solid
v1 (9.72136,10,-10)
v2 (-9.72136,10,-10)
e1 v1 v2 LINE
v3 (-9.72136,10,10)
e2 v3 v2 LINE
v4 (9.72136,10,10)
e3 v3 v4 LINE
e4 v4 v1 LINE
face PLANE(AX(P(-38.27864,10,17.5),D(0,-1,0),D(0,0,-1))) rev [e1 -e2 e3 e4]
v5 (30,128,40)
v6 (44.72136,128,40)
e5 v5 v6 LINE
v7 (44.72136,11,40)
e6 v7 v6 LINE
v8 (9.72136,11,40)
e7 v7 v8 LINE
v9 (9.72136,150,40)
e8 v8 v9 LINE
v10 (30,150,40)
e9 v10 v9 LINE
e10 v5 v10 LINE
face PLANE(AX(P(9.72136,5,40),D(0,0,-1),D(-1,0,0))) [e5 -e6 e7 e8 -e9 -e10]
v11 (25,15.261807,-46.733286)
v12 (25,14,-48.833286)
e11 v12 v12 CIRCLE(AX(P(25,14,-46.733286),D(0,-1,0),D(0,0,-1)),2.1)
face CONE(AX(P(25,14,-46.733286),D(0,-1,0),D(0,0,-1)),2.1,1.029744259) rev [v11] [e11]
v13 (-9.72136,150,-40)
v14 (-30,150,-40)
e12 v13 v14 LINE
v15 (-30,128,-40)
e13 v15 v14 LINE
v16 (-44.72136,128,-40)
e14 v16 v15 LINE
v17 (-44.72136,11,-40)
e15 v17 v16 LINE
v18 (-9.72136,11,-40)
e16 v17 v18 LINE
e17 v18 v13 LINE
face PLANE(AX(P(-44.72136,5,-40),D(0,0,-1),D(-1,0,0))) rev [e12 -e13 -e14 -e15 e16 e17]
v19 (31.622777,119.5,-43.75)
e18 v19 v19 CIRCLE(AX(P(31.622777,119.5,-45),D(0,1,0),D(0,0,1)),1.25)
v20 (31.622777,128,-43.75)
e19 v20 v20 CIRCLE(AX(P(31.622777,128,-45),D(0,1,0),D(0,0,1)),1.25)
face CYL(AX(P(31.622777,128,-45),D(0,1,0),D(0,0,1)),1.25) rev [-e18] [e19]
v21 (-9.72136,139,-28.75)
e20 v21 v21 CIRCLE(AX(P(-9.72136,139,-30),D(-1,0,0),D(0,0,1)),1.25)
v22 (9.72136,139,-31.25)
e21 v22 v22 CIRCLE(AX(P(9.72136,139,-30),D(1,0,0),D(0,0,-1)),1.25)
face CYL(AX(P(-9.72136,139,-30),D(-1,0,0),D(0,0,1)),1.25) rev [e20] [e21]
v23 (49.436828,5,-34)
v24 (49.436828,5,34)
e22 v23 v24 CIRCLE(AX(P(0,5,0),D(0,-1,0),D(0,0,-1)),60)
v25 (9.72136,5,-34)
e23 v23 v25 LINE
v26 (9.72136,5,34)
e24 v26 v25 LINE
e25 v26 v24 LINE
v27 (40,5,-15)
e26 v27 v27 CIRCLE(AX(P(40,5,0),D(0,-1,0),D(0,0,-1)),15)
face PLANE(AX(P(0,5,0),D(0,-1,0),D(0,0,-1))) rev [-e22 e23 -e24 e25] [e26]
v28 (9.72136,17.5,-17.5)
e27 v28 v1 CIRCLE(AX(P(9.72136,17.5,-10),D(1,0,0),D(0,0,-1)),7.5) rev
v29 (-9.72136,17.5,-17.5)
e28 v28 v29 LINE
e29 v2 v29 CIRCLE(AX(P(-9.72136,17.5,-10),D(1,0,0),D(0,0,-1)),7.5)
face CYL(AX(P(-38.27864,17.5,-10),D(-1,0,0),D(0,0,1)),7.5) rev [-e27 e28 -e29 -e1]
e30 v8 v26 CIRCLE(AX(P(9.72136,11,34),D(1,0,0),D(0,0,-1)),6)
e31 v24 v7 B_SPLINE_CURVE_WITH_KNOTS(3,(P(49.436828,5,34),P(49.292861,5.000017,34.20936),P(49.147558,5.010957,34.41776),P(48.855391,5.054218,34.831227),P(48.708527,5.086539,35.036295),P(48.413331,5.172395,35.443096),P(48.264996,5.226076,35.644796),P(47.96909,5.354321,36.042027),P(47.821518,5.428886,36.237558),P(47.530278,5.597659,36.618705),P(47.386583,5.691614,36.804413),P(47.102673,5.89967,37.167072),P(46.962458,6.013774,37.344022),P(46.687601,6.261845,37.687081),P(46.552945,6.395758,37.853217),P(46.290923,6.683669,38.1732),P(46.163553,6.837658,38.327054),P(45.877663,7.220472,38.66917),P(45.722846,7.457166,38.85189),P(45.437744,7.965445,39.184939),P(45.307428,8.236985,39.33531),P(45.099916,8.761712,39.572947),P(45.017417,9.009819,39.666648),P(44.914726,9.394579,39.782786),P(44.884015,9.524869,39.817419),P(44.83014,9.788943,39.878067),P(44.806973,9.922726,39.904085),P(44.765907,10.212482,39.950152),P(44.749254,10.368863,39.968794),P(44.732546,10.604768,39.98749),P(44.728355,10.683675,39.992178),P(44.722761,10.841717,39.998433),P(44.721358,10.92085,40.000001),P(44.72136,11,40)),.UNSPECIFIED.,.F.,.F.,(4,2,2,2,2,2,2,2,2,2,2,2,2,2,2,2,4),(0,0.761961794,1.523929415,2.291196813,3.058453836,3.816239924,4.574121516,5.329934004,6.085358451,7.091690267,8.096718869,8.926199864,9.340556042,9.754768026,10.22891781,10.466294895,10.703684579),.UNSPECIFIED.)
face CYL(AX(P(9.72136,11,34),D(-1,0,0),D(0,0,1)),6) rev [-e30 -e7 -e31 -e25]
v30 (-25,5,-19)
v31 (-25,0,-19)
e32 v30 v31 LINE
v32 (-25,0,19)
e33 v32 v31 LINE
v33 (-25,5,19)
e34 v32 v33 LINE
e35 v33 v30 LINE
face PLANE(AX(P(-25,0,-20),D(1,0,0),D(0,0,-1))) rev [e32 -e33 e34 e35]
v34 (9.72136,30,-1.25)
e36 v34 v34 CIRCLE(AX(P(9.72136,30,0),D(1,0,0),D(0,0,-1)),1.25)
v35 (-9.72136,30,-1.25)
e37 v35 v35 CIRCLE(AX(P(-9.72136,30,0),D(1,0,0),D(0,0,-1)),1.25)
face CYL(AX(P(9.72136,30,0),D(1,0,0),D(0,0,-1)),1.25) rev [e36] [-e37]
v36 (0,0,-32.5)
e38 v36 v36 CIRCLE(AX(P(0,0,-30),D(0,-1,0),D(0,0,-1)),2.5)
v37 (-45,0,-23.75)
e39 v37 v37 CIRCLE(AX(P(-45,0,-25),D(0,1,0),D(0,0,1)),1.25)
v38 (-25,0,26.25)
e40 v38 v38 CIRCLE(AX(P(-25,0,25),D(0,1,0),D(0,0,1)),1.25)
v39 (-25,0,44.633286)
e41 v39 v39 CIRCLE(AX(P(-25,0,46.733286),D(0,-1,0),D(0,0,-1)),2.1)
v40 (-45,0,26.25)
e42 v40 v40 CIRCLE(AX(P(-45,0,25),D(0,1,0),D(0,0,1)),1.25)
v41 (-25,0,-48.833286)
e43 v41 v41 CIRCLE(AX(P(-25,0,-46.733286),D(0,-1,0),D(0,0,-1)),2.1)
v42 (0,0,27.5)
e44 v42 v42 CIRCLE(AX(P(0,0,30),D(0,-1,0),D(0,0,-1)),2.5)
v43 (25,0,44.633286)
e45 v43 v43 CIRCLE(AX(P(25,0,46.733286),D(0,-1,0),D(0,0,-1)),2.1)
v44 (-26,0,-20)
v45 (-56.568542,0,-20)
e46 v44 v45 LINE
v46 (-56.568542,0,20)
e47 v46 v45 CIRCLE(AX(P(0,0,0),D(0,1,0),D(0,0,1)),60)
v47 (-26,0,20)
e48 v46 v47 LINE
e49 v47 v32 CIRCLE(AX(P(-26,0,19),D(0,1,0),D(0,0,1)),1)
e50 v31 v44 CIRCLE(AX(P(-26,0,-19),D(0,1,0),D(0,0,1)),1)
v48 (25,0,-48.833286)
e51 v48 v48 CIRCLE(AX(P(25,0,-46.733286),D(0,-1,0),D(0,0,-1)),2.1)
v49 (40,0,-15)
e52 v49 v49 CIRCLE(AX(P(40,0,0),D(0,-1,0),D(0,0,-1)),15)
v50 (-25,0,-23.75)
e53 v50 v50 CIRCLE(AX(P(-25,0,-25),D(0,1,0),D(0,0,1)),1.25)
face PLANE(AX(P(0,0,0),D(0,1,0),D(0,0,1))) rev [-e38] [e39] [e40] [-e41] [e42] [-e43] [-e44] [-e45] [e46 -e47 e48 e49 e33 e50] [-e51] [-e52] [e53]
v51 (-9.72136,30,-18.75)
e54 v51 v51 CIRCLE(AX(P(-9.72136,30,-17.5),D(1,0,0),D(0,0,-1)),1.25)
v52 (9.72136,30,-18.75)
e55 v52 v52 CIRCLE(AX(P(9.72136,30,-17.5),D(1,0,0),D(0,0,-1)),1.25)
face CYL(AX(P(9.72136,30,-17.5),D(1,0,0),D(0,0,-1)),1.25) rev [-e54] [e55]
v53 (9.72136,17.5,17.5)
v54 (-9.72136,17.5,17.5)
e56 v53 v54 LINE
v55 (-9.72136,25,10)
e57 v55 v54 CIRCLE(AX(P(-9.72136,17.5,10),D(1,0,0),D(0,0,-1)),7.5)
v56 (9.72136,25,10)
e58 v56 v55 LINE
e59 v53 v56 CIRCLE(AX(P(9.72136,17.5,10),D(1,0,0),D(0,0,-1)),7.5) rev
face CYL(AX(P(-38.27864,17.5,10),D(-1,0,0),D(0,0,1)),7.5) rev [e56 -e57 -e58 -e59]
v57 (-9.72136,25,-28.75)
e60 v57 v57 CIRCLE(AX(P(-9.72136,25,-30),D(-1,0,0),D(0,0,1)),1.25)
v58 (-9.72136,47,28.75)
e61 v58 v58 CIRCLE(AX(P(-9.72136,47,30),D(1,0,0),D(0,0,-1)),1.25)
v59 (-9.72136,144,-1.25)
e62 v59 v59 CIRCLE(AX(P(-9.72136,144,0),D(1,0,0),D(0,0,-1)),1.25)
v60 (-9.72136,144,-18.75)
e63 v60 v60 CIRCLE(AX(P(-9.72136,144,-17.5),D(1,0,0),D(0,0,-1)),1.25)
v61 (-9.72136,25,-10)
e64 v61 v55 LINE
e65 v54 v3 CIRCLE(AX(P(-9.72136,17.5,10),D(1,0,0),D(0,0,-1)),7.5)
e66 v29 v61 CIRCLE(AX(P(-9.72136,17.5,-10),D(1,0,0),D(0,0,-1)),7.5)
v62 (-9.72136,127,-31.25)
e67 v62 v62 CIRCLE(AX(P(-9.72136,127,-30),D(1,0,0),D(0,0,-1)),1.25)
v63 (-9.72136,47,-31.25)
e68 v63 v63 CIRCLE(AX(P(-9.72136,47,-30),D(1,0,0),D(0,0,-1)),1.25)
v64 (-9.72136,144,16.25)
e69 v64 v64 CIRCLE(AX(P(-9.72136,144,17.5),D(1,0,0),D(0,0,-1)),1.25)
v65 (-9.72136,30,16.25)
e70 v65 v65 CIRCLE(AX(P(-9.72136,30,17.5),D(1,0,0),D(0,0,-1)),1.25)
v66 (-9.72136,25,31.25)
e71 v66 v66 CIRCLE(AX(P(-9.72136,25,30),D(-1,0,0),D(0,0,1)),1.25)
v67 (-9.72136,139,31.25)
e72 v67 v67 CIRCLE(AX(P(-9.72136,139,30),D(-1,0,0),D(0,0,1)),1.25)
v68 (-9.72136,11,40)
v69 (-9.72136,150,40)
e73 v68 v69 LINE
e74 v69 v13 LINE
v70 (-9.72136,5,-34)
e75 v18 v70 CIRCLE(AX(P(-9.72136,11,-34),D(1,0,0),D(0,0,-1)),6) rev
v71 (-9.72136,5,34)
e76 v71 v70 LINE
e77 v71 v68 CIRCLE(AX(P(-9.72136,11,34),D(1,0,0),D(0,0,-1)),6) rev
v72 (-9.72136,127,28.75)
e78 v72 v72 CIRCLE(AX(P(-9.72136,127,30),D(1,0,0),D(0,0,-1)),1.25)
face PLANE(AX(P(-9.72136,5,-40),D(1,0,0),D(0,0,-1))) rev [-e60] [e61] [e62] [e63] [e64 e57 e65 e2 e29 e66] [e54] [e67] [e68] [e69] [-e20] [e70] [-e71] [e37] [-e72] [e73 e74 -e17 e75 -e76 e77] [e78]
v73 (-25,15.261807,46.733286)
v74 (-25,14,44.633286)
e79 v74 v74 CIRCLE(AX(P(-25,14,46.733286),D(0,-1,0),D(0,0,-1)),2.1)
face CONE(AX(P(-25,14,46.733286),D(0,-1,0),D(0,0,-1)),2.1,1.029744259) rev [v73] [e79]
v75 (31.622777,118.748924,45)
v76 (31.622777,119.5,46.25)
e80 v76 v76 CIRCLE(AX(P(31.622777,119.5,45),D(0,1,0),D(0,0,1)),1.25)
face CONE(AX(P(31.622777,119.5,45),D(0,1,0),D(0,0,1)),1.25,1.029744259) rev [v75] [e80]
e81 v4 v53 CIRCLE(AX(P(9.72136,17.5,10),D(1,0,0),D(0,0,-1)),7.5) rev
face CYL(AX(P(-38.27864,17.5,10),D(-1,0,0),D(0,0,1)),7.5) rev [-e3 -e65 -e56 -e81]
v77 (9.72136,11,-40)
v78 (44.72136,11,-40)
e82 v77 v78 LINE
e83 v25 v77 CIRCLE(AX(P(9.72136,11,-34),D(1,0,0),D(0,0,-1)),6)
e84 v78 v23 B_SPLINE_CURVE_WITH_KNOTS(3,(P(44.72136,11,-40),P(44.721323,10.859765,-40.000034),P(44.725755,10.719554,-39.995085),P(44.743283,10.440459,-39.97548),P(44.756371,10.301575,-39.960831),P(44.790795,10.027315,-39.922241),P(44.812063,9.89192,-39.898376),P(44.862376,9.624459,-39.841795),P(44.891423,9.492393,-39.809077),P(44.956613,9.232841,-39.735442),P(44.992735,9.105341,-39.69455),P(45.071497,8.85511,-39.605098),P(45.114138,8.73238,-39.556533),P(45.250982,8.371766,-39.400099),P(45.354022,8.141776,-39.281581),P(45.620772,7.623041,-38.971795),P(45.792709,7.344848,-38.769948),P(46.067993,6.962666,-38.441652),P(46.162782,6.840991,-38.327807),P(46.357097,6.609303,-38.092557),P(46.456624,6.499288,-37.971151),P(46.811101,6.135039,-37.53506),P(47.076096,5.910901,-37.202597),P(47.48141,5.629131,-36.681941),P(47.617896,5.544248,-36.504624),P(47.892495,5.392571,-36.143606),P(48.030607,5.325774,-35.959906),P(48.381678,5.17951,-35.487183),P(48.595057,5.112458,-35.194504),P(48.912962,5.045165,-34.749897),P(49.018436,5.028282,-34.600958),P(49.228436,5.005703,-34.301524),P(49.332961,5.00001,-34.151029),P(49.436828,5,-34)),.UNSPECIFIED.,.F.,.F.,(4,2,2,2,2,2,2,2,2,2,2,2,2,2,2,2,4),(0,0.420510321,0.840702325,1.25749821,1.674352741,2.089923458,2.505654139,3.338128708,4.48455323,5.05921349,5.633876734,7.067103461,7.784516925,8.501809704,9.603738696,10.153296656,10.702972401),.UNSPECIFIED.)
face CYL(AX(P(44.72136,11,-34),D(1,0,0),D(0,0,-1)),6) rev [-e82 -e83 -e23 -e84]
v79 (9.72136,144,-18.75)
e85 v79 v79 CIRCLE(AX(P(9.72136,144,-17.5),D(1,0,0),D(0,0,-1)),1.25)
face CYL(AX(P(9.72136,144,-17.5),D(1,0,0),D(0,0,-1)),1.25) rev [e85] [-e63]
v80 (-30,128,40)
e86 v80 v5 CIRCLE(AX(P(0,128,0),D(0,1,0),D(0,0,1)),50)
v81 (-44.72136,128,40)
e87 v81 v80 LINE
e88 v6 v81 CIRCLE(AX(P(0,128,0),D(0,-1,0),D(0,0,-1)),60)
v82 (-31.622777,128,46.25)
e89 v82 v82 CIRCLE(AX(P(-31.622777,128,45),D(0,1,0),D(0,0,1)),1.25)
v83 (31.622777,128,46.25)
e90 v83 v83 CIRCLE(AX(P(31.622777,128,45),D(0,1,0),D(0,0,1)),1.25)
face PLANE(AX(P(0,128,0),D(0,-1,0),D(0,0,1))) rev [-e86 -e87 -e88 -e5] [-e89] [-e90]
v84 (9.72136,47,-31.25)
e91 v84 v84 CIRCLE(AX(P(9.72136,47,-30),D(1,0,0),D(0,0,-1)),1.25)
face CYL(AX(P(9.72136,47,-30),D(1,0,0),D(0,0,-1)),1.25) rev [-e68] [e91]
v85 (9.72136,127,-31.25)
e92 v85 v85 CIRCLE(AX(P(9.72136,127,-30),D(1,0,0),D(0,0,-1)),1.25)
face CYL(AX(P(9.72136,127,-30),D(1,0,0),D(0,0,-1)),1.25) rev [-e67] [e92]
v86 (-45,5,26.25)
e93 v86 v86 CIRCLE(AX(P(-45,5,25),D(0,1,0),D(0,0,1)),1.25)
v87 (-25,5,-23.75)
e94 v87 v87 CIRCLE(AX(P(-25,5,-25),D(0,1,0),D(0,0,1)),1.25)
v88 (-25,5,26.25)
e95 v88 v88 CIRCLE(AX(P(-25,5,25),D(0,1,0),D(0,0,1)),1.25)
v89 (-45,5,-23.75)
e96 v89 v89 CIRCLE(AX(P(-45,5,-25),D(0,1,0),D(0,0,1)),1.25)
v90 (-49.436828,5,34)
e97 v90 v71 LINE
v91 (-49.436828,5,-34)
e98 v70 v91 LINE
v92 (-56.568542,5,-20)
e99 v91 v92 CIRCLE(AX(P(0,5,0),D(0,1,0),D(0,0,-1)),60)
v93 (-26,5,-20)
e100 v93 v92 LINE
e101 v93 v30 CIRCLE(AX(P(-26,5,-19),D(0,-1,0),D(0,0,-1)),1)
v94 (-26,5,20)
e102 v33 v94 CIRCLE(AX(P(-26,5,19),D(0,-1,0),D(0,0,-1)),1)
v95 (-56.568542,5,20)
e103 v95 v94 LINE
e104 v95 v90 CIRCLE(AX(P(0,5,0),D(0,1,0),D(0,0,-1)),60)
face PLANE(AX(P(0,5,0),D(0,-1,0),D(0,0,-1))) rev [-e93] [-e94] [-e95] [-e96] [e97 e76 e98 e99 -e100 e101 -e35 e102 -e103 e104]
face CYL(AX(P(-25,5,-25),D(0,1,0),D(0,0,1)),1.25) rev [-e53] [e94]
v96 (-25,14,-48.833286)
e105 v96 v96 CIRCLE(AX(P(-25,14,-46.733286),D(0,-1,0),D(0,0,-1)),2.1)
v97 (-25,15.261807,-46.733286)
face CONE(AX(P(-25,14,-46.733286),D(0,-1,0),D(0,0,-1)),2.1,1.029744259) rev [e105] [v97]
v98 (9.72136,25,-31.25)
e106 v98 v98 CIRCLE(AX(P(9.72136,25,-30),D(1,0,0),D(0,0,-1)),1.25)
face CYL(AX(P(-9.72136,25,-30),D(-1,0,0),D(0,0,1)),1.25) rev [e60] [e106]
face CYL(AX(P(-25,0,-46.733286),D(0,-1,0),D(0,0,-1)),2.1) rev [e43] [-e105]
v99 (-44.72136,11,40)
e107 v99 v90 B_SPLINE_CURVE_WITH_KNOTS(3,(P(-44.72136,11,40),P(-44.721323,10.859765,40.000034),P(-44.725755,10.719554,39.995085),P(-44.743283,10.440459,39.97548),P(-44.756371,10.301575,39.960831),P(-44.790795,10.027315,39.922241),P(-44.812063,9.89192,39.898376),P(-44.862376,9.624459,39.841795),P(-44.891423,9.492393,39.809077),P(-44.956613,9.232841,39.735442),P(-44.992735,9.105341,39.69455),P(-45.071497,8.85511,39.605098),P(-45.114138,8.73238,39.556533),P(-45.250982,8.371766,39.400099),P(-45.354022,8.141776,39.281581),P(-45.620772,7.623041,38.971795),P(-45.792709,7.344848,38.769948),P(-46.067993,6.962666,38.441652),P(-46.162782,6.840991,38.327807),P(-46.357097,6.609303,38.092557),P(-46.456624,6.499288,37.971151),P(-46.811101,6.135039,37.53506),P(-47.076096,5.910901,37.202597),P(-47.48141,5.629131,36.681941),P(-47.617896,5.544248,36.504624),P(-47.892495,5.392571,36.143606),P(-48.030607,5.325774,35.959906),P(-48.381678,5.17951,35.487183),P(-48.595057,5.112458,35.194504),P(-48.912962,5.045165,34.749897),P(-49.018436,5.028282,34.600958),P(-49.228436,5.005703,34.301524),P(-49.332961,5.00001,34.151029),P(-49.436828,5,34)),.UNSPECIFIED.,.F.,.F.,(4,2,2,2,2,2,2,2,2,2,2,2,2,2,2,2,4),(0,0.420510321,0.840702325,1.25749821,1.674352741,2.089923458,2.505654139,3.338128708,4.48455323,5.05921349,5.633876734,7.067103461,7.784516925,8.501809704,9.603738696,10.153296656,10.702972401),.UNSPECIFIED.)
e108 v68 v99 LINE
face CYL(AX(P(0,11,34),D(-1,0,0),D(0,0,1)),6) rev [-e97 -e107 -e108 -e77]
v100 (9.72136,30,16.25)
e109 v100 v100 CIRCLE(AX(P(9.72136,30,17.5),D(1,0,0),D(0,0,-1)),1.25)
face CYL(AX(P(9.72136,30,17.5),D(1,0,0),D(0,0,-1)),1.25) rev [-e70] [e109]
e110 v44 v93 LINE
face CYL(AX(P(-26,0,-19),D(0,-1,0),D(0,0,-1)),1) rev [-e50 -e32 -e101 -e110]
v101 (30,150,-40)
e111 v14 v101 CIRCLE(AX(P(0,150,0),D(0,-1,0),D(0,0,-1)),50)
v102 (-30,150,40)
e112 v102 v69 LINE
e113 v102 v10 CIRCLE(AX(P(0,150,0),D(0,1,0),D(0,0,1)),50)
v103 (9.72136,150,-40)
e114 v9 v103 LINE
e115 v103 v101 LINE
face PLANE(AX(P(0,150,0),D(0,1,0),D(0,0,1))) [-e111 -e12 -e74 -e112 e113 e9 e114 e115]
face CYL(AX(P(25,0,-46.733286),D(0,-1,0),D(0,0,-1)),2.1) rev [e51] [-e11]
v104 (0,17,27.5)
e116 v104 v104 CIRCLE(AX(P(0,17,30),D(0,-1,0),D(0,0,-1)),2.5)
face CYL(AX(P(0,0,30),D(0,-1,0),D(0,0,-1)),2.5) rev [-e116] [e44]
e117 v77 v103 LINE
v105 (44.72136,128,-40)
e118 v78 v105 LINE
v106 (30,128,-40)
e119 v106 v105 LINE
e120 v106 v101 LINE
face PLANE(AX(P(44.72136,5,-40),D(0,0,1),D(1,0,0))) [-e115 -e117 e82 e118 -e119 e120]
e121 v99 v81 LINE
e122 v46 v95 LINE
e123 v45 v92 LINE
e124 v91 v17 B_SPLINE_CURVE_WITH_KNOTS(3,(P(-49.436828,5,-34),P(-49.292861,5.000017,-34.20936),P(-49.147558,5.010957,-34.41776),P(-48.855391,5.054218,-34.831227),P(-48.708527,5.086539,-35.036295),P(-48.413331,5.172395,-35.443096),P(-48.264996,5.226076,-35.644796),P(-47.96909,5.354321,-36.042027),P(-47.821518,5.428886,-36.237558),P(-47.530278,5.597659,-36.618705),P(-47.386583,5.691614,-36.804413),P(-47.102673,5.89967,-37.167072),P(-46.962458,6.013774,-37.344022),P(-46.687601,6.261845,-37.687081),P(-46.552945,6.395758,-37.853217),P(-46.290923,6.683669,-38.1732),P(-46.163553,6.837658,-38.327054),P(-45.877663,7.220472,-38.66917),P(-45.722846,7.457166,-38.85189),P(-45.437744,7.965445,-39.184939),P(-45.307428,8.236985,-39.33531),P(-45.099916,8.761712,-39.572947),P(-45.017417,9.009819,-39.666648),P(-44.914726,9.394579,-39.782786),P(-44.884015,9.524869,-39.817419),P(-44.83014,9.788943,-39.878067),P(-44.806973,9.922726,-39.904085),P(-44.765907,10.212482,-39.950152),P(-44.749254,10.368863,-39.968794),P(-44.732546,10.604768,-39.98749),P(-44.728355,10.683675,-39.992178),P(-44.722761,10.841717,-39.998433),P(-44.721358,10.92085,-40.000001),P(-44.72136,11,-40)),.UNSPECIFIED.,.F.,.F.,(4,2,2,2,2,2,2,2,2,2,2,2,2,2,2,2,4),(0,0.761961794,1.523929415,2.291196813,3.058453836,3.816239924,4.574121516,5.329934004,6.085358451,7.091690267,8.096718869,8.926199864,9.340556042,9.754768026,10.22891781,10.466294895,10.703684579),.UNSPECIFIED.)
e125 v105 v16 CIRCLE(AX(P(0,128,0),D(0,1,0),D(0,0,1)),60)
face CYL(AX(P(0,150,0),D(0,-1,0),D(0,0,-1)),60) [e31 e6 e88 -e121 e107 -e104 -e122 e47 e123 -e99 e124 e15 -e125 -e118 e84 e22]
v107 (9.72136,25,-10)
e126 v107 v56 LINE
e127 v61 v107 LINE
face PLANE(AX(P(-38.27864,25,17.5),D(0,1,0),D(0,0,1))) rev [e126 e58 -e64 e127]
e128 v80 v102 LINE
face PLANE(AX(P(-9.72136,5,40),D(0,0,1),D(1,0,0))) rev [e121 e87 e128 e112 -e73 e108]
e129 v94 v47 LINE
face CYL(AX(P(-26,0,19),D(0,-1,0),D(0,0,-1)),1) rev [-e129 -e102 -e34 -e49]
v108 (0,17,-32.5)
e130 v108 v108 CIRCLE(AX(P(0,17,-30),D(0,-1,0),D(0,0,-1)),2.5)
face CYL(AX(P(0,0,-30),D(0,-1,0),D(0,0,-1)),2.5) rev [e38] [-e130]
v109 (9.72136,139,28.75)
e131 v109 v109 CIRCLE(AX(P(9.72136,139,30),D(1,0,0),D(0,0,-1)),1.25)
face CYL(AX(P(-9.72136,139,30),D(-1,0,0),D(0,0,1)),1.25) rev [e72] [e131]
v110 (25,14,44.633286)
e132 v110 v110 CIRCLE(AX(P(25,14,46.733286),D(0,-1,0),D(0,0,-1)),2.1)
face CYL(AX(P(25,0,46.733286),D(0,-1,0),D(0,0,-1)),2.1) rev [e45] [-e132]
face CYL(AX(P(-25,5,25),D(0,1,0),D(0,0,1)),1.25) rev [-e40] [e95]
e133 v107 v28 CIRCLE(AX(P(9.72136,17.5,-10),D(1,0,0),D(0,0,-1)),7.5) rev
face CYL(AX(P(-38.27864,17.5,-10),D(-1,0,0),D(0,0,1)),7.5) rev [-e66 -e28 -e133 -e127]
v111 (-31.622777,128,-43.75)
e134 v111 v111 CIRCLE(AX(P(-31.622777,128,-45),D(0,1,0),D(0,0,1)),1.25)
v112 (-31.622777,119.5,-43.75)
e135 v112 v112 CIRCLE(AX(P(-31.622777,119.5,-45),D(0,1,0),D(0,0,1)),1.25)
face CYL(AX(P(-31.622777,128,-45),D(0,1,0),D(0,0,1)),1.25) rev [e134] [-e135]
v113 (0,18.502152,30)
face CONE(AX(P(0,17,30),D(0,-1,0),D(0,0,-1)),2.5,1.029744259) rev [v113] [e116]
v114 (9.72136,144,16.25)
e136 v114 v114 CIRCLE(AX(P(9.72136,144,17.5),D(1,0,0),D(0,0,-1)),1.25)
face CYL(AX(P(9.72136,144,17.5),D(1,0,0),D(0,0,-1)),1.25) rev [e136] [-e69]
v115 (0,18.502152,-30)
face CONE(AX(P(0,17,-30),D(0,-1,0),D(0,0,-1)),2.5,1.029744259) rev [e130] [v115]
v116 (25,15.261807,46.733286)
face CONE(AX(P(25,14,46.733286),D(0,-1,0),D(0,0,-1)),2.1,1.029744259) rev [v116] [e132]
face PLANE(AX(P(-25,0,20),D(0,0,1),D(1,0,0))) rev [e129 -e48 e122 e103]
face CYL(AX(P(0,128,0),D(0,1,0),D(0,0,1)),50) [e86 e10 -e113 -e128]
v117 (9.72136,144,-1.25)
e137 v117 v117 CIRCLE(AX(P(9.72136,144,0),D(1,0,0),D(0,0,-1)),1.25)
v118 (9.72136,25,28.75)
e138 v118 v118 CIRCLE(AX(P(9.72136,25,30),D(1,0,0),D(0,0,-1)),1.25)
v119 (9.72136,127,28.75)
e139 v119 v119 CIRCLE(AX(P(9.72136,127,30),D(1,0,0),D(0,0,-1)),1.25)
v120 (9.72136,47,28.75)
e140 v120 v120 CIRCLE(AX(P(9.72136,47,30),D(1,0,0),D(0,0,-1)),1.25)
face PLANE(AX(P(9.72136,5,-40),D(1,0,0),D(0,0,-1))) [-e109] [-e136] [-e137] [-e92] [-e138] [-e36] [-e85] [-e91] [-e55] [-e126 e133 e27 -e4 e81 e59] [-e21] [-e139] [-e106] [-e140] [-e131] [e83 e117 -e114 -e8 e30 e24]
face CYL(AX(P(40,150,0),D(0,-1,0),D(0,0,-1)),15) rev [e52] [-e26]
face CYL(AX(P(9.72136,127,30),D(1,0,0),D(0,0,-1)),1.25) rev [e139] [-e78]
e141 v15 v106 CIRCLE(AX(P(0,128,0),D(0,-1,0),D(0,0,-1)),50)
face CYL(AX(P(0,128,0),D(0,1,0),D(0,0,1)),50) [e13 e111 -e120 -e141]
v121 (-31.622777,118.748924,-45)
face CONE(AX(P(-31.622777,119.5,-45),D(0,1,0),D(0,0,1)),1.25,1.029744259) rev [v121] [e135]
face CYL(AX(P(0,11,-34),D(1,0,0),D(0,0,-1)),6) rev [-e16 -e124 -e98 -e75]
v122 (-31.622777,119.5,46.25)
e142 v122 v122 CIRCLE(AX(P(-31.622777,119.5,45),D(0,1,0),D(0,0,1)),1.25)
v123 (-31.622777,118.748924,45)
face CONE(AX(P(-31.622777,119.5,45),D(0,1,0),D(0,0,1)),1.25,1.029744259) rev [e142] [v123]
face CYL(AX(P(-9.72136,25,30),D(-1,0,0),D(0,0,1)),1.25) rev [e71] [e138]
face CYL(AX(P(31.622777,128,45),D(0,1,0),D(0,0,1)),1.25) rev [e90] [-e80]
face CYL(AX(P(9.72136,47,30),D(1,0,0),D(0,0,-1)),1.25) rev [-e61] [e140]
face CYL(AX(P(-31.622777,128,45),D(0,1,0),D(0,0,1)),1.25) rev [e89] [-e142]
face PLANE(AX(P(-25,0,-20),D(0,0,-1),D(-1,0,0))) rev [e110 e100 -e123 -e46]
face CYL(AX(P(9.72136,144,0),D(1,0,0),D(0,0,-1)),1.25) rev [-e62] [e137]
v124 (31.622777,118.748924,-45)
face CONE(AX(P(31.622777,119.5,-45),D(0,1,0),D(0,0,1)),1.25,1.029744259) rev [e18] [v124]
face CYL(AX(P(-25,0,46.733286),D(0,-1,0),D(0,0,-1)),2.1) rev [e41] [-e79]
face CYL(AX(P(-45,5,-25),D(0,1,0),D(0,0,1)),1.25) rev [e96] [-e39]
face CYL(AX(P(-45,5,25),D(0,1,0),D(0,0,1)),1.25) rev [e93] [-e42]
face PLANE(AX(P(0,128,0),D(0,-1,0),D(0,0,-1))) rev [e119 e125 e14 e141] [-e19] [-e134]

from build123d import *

# Parameters (mm, degrees)
SKETCH_1_R                         = 60
EXTRUDE_1_DEPTH                    = 150
CUT_EXTRUDE_START                  = -145
CUT_EXTRUDE_1_DEPTH                = 145
M3X0_5_6MM_D                       = 2.5
CUT_EXTRUDE_START_2                = -22
CUT_EXTRUDE_2_DEPTH                = 22
M3X0_5_SPACER_HUB_BOARD_AT_2_COUNT = 2
M3X0_5_SPACER_HUB_BOARD_AT_2_PITCH = 63.245553203
CUT_EXTRUDE_5070_DEPTH             = 169.002976164
SKETCH_14_R                        = 15
CUT_EXTRUDE_5330_DEPTH             = 173.336879396
M3X0_5_6MM_OBC_D                   = 2.5
FILLET_1_R                         = 1
M5X0_8_20MM_BASW_PLATE_D           = 4.2
M5X0_8_20MM_BASW_PLATE_DEPTH       = 14
M5X0_8_20MM_BASW_PLATE_TIP         = 1.2618073
FILLET_2_R                         = 6
FILLET_3_R                         = 6
SKETCH_19_W                        = 35
SKETCH_19_H                        = 15
CUT_EXTRUDE_3_DEPTH                = 48
FILLET_4_R                         = 7.5
M3X0_5_2_D                         = 2.5
M3X0_5_3_D                         = 2.5


with BuildPart() as part:
    # ｽｹｯﾁ1 → ﾎﾞｽ - 押し出し1 (new body)
    with BuildSketch(Plane(origin=(0, 0, 0), x_dir=(1, 0, 0), z_dir=(0, 1, 0))):
        with Locations(Location((0, 0, 0), (0, 0, 270))):
            Circle(SKETCH_1_R)
    extrude(amount=EXTRUDE_1_DEPTH)

    # ｽｹｯﾁ2 → ｶｯﾄ - 押し出し1 (cut)
    with BuildSketch(Plane(origin=(0, 150, 0), x_dir=(1, 0, 0), z_dir=(0, 1, 0)).offset(CUT_EXTRUDE_START)):
        with BuildLine():
            Line((-44.72135955, 40), (-9.72135955, 40))
            Line((-9.72135955, 40), (-9.72135955, -40))
            Line((-9.72135955, -40), (-44.72135955, -40))
            ThreePointArc((-44.72135955, -40), (-60, 0), (-44.72135955, 40))
        make_face()
    cut_extrude_1 = extrude(amount=CUT_EXTRUDE_1_DEPTH, mode=Mode.SUBTRACT)

    # ﾐﾗｰ1: ｶｯﾄ - 押し出し1 across plane
    add(cut_extrude_1.mirror(Plane(origin=(0, 0, 0), x_dir=(0, 0, 1), z_dir=(1, 0, 0))), mode=Mode.SUBTRACT)

    # ｽｹｯﾁ4 → M6x1.0(20mm) Base_Plateへの固定用ねじ穴 (revolve, cut)
    with BuildSketch(Plane(origin=(0, 0, 30), x_dir=(0, 0, -1), z_dir=(1, 0, 0))):
        Polygon((0, 0), (0, 18.502151548), (2.5, 17), (2.5, 0), align=None)
    m6x1_0_20mm_base_plate = revolve(axis=Axis((0, -6.35, 30), (0, 1, 0)), mode=Mode.SUBTRACT)

    # ﾐﾗｰ2: M6x1.0(20mm) Base_Plateへの固定用ねじ穴 across plane
    add(m6x1_0_20mm_base_plate.mirror(Plane.XY), mode=Mode.SUBTRACT)

    # M3x0.5(6mm) 送信機固定用ねじ穴 (through all)
    with Locations(Plane(origin=(9.72135955, 144, 17.5), x_dir=(0, 0, 1), z_dir=(1, 0, 0))):
        with Locations((0, 0), (-17.5, 0), (-35, 0), (-17.5, 114), (0, 114), (-35, 114)):
            Hole(M3X0_5_6MM_D / 2)

    # ｽｹｯﾁ10 → ｶｯﾄ - 押し出し2 (cut)
    with BuildSketch(Plane(origin=(0, 150, 0), x_dir=(1, 0, 0), z_dir=(0, 1, 0)).offset(CUT_EXTRUDE_START_2)):
        with BuildLine():
            Line((-30, 40), (-44.72135955, 40))
            ThreePointArc((-44.72135955, 40), (0, 60), (44.72135955, 40))
            Line((44.72135955, 40), (30, 40))
            ThreePointArc((30, 40), (0, 50), (-30, 40))
        make_face()
    cut_extrude_2 = extrude(amount=CUT_EXTRUDE_2_DEPTH, mode=Mode.SUBTRACT)

    # ﾐﾗｰ3: ｶｯﾄ - 押し出し2 across plane
    add(cut_extrude_2.mirror(Plane.XY), mode=Mode.SUBTRACT)

    # ｽｹｯﾁ12 → M3x0.5(Spacer) Hub_Board固定用ねじ穴 (revolve, cut)
    with BuildSketch(Plane(origin=(-31.622776602, 128, -45), x_dir=(0, 0, 1), z_dir=(1, 0, 0))):
        Polygon((0, 0), (0, 9.251075774), (1.25, 8.5), (1.25, 0), align=None)
    m3x0_5_spacer_hub_board = revolve(axis=Axis((-31.622776602, 134.35, -45), (0, -1, 0)), mode=Mode.SUBTRACT)

    # M3x0.5(Spacer) Hub_Board固定用ねじ穴 at 2: M3x0.5(Spacer) Hub_Board固定用ねじ穴 ×2
    with Locations(*[(i * M3X0_5_SPACER_HUB_BOARD_AT_2_PITCH, 0, 0) for i in range(1, M3X0_5_SPACER_HUB_BOARD_AT_2_COUNT)]):
        add(m3x0_5_spacer_hub_board, mode=Mode.SUBTRACT)

    # ﾐﾗｰ4: M3x0.5(Spacer) Hub_Board固定用ねじ穴 across plane
    add(m3x0_5_spacer_hub_board.mirror(Plane.XY), mode=Mode.SUBTRACT)

    # ﾐﾗｰ4 copy 1 sketch → ﾐﾗｰ4 copy 1 (revolve, cut)
    with BuildSketch(Plane(origin=(31.622776602, 128, 45), x_dir=(0, 0, -1), z_dir=(1, 0, 0))):
        Polygon((0, 0), (0, -9.251075774), (1.25, -8.5), (1.25, 0), align=None)
    revolve(axis=Axis((31.622776602, 134.35, 45), (0, 1, 0)), mode=Mode.SUBTRACT)

    # ｽｹｯﾁ13 → Cut-Extrude 5070 (cut, through all)
    with BuildSketch(Plane(origin=(0, 5, 0), x_dir=(1, 0, 0), z_dir=(0, 1, 0))):
        with BuildLine():
            Line((-25, 20), (-56.568542495, 20))
            ThreePointArc((-56.568542495, 20), (-60, 0), (-56.568542495, -20))
            Line((-56.568542495, -20), (-25, -20))
            Line((-25, -20), (-25, 20))
        make_face()
    extrude(amount=-CUT_EXTRUDE_5070_DEPTH, mode=Mode.SUBTRACT)

    # ｽｹｯﾁ14 → Cut-Extrude 5330 (cut, through all)
    with BuildSketch(Plane.XZ):
        with Locations(Location((40, 0, 0), (0, 0, 270))):
            Circle(SKETCH_14_R)
    extrude(amount=-CUT_EXTRUDE_5330_DEPTH, mode=Mode.SUBTRACT)

    # M3x0.5(6mm) OBC固定用ねじ穴 (through all)
    with Locations(Plane(origin=(-9.72135955, 139, -30), x_dir=(0, 0, -1), z_dir=(-1, 0, 0))):
        with Locations((0, 0), (-60, 0), (0, 114), (-60, 114)):
            Hole(M3X0_5_6MM_OBC_D / 2)

    # ﾌｨﾚｯﾄ1
    fillet_1_edges = [part.edges().sort_by_distance(p)[0] for p in [
        (-25, 2.5, -20),
        (-25, 2.5, 20),
    ]]
    fillet(fillet_1_edges, radius=FILLET_1_R)

    # M5x0.8(20mm) Basw_Plateへの固定用ねじ穴
    with Locations(Plane(origin=(-25, 0, 46.733285782), x_dir=(0, 0, -1), z_dir=(0, -1, 0))):
        with Locations((0, 0), (0, 50), (93.466571564, 0), (93.466571564, 50)):
            Hole(M5X0_8_20MM_BASW_PLATE_D / 2, depth=M5X0_8_20MM_BASW_PLATE_DEPTH)
            with Locations((0, 0, -(M5X0_8_20MM_BASW_PLATE_DEPTH + M5X0_8_20MM_BASW_PLATE_TIP / 2))):  # 118° drill point
                Cone(0, M5X0_8_20MM_BASW_PLATE_D / 2, M5X0_8_20MM_BASW_PLATE_TIP, mode=Mode.SUBTRACT)

    # ﾌｨﾚｯﾄ2
    fillet_2_edges = [part.edges().sort_by_distance(p)[0] for p in [
        (27.22135955, 5, 40),
        (27.22135955, 5, -40),
    ]]
    fillet(fillet_2_edges, radius=FILLET_2_R)

    # ﾌｨﾚｯﾄ3
    fillet_3_edges = [part.edges().sort_by_distance(p)[0] for p in [
        (-27.22135955, 5, -40),
        (-27.22135955, 5, 40),
    ]]
    fillet(fillet_3_edges, radius=FILLET_3_R)

    # ｽｹｯﾁ19 → ｶｯﾄ - 押し出し3 (cut)
    with BuildSketch(Plane(origin=(9.72135955, 0, 0), x_dir=(0, 0, -1), z_dir=(1, 0, 0))):
        with Locations((0, 17.5)):
            Rectangle(SKETCH_19_W, SKETCH_19_H)
    extrude(amount=-CUT_EXTRUDE_3_DEPTH, mode=Mode.SUBTRACT)

    # ﾌｨﾚｯﾄ4
    fillet_4_edges = [part.edges().sort_by_distance(p)[0] for p in [
        (0, 25, 17.5),
        (0, 10, 17.5),
        (0, 10, -17.5),
        (0, 25, -17.5),
    ]]
    fillet(fillet_4_edges, radius=FILLET_4_R - 0.0001)  # a hair under: the kernel refuses the full size

    # M3x0.5 ねじ穴2 (through all)
    with Locations(Plane(origin=(-45, 5, -25), x_dir=(0, 0, 1), z_dir=(0, 1, 0))):
        with Locations((0, 0), (0, 20), (50, 20), (50, 0)):
            Hole(M3X0_5_2_D / 2)

    # M3x0.5 ねじ穴3 (through all)
    with Locations(Plane(origin=(9.72135955, 127, 30), x_dir=(0, 0, 1), z_dir=(1, 0, 0))):
        with Locations((0, 0), (0, 80), (-60, 80), (-60, 0)):
            Hole(M3X0_5_3_D / 2)


solid = part.part
